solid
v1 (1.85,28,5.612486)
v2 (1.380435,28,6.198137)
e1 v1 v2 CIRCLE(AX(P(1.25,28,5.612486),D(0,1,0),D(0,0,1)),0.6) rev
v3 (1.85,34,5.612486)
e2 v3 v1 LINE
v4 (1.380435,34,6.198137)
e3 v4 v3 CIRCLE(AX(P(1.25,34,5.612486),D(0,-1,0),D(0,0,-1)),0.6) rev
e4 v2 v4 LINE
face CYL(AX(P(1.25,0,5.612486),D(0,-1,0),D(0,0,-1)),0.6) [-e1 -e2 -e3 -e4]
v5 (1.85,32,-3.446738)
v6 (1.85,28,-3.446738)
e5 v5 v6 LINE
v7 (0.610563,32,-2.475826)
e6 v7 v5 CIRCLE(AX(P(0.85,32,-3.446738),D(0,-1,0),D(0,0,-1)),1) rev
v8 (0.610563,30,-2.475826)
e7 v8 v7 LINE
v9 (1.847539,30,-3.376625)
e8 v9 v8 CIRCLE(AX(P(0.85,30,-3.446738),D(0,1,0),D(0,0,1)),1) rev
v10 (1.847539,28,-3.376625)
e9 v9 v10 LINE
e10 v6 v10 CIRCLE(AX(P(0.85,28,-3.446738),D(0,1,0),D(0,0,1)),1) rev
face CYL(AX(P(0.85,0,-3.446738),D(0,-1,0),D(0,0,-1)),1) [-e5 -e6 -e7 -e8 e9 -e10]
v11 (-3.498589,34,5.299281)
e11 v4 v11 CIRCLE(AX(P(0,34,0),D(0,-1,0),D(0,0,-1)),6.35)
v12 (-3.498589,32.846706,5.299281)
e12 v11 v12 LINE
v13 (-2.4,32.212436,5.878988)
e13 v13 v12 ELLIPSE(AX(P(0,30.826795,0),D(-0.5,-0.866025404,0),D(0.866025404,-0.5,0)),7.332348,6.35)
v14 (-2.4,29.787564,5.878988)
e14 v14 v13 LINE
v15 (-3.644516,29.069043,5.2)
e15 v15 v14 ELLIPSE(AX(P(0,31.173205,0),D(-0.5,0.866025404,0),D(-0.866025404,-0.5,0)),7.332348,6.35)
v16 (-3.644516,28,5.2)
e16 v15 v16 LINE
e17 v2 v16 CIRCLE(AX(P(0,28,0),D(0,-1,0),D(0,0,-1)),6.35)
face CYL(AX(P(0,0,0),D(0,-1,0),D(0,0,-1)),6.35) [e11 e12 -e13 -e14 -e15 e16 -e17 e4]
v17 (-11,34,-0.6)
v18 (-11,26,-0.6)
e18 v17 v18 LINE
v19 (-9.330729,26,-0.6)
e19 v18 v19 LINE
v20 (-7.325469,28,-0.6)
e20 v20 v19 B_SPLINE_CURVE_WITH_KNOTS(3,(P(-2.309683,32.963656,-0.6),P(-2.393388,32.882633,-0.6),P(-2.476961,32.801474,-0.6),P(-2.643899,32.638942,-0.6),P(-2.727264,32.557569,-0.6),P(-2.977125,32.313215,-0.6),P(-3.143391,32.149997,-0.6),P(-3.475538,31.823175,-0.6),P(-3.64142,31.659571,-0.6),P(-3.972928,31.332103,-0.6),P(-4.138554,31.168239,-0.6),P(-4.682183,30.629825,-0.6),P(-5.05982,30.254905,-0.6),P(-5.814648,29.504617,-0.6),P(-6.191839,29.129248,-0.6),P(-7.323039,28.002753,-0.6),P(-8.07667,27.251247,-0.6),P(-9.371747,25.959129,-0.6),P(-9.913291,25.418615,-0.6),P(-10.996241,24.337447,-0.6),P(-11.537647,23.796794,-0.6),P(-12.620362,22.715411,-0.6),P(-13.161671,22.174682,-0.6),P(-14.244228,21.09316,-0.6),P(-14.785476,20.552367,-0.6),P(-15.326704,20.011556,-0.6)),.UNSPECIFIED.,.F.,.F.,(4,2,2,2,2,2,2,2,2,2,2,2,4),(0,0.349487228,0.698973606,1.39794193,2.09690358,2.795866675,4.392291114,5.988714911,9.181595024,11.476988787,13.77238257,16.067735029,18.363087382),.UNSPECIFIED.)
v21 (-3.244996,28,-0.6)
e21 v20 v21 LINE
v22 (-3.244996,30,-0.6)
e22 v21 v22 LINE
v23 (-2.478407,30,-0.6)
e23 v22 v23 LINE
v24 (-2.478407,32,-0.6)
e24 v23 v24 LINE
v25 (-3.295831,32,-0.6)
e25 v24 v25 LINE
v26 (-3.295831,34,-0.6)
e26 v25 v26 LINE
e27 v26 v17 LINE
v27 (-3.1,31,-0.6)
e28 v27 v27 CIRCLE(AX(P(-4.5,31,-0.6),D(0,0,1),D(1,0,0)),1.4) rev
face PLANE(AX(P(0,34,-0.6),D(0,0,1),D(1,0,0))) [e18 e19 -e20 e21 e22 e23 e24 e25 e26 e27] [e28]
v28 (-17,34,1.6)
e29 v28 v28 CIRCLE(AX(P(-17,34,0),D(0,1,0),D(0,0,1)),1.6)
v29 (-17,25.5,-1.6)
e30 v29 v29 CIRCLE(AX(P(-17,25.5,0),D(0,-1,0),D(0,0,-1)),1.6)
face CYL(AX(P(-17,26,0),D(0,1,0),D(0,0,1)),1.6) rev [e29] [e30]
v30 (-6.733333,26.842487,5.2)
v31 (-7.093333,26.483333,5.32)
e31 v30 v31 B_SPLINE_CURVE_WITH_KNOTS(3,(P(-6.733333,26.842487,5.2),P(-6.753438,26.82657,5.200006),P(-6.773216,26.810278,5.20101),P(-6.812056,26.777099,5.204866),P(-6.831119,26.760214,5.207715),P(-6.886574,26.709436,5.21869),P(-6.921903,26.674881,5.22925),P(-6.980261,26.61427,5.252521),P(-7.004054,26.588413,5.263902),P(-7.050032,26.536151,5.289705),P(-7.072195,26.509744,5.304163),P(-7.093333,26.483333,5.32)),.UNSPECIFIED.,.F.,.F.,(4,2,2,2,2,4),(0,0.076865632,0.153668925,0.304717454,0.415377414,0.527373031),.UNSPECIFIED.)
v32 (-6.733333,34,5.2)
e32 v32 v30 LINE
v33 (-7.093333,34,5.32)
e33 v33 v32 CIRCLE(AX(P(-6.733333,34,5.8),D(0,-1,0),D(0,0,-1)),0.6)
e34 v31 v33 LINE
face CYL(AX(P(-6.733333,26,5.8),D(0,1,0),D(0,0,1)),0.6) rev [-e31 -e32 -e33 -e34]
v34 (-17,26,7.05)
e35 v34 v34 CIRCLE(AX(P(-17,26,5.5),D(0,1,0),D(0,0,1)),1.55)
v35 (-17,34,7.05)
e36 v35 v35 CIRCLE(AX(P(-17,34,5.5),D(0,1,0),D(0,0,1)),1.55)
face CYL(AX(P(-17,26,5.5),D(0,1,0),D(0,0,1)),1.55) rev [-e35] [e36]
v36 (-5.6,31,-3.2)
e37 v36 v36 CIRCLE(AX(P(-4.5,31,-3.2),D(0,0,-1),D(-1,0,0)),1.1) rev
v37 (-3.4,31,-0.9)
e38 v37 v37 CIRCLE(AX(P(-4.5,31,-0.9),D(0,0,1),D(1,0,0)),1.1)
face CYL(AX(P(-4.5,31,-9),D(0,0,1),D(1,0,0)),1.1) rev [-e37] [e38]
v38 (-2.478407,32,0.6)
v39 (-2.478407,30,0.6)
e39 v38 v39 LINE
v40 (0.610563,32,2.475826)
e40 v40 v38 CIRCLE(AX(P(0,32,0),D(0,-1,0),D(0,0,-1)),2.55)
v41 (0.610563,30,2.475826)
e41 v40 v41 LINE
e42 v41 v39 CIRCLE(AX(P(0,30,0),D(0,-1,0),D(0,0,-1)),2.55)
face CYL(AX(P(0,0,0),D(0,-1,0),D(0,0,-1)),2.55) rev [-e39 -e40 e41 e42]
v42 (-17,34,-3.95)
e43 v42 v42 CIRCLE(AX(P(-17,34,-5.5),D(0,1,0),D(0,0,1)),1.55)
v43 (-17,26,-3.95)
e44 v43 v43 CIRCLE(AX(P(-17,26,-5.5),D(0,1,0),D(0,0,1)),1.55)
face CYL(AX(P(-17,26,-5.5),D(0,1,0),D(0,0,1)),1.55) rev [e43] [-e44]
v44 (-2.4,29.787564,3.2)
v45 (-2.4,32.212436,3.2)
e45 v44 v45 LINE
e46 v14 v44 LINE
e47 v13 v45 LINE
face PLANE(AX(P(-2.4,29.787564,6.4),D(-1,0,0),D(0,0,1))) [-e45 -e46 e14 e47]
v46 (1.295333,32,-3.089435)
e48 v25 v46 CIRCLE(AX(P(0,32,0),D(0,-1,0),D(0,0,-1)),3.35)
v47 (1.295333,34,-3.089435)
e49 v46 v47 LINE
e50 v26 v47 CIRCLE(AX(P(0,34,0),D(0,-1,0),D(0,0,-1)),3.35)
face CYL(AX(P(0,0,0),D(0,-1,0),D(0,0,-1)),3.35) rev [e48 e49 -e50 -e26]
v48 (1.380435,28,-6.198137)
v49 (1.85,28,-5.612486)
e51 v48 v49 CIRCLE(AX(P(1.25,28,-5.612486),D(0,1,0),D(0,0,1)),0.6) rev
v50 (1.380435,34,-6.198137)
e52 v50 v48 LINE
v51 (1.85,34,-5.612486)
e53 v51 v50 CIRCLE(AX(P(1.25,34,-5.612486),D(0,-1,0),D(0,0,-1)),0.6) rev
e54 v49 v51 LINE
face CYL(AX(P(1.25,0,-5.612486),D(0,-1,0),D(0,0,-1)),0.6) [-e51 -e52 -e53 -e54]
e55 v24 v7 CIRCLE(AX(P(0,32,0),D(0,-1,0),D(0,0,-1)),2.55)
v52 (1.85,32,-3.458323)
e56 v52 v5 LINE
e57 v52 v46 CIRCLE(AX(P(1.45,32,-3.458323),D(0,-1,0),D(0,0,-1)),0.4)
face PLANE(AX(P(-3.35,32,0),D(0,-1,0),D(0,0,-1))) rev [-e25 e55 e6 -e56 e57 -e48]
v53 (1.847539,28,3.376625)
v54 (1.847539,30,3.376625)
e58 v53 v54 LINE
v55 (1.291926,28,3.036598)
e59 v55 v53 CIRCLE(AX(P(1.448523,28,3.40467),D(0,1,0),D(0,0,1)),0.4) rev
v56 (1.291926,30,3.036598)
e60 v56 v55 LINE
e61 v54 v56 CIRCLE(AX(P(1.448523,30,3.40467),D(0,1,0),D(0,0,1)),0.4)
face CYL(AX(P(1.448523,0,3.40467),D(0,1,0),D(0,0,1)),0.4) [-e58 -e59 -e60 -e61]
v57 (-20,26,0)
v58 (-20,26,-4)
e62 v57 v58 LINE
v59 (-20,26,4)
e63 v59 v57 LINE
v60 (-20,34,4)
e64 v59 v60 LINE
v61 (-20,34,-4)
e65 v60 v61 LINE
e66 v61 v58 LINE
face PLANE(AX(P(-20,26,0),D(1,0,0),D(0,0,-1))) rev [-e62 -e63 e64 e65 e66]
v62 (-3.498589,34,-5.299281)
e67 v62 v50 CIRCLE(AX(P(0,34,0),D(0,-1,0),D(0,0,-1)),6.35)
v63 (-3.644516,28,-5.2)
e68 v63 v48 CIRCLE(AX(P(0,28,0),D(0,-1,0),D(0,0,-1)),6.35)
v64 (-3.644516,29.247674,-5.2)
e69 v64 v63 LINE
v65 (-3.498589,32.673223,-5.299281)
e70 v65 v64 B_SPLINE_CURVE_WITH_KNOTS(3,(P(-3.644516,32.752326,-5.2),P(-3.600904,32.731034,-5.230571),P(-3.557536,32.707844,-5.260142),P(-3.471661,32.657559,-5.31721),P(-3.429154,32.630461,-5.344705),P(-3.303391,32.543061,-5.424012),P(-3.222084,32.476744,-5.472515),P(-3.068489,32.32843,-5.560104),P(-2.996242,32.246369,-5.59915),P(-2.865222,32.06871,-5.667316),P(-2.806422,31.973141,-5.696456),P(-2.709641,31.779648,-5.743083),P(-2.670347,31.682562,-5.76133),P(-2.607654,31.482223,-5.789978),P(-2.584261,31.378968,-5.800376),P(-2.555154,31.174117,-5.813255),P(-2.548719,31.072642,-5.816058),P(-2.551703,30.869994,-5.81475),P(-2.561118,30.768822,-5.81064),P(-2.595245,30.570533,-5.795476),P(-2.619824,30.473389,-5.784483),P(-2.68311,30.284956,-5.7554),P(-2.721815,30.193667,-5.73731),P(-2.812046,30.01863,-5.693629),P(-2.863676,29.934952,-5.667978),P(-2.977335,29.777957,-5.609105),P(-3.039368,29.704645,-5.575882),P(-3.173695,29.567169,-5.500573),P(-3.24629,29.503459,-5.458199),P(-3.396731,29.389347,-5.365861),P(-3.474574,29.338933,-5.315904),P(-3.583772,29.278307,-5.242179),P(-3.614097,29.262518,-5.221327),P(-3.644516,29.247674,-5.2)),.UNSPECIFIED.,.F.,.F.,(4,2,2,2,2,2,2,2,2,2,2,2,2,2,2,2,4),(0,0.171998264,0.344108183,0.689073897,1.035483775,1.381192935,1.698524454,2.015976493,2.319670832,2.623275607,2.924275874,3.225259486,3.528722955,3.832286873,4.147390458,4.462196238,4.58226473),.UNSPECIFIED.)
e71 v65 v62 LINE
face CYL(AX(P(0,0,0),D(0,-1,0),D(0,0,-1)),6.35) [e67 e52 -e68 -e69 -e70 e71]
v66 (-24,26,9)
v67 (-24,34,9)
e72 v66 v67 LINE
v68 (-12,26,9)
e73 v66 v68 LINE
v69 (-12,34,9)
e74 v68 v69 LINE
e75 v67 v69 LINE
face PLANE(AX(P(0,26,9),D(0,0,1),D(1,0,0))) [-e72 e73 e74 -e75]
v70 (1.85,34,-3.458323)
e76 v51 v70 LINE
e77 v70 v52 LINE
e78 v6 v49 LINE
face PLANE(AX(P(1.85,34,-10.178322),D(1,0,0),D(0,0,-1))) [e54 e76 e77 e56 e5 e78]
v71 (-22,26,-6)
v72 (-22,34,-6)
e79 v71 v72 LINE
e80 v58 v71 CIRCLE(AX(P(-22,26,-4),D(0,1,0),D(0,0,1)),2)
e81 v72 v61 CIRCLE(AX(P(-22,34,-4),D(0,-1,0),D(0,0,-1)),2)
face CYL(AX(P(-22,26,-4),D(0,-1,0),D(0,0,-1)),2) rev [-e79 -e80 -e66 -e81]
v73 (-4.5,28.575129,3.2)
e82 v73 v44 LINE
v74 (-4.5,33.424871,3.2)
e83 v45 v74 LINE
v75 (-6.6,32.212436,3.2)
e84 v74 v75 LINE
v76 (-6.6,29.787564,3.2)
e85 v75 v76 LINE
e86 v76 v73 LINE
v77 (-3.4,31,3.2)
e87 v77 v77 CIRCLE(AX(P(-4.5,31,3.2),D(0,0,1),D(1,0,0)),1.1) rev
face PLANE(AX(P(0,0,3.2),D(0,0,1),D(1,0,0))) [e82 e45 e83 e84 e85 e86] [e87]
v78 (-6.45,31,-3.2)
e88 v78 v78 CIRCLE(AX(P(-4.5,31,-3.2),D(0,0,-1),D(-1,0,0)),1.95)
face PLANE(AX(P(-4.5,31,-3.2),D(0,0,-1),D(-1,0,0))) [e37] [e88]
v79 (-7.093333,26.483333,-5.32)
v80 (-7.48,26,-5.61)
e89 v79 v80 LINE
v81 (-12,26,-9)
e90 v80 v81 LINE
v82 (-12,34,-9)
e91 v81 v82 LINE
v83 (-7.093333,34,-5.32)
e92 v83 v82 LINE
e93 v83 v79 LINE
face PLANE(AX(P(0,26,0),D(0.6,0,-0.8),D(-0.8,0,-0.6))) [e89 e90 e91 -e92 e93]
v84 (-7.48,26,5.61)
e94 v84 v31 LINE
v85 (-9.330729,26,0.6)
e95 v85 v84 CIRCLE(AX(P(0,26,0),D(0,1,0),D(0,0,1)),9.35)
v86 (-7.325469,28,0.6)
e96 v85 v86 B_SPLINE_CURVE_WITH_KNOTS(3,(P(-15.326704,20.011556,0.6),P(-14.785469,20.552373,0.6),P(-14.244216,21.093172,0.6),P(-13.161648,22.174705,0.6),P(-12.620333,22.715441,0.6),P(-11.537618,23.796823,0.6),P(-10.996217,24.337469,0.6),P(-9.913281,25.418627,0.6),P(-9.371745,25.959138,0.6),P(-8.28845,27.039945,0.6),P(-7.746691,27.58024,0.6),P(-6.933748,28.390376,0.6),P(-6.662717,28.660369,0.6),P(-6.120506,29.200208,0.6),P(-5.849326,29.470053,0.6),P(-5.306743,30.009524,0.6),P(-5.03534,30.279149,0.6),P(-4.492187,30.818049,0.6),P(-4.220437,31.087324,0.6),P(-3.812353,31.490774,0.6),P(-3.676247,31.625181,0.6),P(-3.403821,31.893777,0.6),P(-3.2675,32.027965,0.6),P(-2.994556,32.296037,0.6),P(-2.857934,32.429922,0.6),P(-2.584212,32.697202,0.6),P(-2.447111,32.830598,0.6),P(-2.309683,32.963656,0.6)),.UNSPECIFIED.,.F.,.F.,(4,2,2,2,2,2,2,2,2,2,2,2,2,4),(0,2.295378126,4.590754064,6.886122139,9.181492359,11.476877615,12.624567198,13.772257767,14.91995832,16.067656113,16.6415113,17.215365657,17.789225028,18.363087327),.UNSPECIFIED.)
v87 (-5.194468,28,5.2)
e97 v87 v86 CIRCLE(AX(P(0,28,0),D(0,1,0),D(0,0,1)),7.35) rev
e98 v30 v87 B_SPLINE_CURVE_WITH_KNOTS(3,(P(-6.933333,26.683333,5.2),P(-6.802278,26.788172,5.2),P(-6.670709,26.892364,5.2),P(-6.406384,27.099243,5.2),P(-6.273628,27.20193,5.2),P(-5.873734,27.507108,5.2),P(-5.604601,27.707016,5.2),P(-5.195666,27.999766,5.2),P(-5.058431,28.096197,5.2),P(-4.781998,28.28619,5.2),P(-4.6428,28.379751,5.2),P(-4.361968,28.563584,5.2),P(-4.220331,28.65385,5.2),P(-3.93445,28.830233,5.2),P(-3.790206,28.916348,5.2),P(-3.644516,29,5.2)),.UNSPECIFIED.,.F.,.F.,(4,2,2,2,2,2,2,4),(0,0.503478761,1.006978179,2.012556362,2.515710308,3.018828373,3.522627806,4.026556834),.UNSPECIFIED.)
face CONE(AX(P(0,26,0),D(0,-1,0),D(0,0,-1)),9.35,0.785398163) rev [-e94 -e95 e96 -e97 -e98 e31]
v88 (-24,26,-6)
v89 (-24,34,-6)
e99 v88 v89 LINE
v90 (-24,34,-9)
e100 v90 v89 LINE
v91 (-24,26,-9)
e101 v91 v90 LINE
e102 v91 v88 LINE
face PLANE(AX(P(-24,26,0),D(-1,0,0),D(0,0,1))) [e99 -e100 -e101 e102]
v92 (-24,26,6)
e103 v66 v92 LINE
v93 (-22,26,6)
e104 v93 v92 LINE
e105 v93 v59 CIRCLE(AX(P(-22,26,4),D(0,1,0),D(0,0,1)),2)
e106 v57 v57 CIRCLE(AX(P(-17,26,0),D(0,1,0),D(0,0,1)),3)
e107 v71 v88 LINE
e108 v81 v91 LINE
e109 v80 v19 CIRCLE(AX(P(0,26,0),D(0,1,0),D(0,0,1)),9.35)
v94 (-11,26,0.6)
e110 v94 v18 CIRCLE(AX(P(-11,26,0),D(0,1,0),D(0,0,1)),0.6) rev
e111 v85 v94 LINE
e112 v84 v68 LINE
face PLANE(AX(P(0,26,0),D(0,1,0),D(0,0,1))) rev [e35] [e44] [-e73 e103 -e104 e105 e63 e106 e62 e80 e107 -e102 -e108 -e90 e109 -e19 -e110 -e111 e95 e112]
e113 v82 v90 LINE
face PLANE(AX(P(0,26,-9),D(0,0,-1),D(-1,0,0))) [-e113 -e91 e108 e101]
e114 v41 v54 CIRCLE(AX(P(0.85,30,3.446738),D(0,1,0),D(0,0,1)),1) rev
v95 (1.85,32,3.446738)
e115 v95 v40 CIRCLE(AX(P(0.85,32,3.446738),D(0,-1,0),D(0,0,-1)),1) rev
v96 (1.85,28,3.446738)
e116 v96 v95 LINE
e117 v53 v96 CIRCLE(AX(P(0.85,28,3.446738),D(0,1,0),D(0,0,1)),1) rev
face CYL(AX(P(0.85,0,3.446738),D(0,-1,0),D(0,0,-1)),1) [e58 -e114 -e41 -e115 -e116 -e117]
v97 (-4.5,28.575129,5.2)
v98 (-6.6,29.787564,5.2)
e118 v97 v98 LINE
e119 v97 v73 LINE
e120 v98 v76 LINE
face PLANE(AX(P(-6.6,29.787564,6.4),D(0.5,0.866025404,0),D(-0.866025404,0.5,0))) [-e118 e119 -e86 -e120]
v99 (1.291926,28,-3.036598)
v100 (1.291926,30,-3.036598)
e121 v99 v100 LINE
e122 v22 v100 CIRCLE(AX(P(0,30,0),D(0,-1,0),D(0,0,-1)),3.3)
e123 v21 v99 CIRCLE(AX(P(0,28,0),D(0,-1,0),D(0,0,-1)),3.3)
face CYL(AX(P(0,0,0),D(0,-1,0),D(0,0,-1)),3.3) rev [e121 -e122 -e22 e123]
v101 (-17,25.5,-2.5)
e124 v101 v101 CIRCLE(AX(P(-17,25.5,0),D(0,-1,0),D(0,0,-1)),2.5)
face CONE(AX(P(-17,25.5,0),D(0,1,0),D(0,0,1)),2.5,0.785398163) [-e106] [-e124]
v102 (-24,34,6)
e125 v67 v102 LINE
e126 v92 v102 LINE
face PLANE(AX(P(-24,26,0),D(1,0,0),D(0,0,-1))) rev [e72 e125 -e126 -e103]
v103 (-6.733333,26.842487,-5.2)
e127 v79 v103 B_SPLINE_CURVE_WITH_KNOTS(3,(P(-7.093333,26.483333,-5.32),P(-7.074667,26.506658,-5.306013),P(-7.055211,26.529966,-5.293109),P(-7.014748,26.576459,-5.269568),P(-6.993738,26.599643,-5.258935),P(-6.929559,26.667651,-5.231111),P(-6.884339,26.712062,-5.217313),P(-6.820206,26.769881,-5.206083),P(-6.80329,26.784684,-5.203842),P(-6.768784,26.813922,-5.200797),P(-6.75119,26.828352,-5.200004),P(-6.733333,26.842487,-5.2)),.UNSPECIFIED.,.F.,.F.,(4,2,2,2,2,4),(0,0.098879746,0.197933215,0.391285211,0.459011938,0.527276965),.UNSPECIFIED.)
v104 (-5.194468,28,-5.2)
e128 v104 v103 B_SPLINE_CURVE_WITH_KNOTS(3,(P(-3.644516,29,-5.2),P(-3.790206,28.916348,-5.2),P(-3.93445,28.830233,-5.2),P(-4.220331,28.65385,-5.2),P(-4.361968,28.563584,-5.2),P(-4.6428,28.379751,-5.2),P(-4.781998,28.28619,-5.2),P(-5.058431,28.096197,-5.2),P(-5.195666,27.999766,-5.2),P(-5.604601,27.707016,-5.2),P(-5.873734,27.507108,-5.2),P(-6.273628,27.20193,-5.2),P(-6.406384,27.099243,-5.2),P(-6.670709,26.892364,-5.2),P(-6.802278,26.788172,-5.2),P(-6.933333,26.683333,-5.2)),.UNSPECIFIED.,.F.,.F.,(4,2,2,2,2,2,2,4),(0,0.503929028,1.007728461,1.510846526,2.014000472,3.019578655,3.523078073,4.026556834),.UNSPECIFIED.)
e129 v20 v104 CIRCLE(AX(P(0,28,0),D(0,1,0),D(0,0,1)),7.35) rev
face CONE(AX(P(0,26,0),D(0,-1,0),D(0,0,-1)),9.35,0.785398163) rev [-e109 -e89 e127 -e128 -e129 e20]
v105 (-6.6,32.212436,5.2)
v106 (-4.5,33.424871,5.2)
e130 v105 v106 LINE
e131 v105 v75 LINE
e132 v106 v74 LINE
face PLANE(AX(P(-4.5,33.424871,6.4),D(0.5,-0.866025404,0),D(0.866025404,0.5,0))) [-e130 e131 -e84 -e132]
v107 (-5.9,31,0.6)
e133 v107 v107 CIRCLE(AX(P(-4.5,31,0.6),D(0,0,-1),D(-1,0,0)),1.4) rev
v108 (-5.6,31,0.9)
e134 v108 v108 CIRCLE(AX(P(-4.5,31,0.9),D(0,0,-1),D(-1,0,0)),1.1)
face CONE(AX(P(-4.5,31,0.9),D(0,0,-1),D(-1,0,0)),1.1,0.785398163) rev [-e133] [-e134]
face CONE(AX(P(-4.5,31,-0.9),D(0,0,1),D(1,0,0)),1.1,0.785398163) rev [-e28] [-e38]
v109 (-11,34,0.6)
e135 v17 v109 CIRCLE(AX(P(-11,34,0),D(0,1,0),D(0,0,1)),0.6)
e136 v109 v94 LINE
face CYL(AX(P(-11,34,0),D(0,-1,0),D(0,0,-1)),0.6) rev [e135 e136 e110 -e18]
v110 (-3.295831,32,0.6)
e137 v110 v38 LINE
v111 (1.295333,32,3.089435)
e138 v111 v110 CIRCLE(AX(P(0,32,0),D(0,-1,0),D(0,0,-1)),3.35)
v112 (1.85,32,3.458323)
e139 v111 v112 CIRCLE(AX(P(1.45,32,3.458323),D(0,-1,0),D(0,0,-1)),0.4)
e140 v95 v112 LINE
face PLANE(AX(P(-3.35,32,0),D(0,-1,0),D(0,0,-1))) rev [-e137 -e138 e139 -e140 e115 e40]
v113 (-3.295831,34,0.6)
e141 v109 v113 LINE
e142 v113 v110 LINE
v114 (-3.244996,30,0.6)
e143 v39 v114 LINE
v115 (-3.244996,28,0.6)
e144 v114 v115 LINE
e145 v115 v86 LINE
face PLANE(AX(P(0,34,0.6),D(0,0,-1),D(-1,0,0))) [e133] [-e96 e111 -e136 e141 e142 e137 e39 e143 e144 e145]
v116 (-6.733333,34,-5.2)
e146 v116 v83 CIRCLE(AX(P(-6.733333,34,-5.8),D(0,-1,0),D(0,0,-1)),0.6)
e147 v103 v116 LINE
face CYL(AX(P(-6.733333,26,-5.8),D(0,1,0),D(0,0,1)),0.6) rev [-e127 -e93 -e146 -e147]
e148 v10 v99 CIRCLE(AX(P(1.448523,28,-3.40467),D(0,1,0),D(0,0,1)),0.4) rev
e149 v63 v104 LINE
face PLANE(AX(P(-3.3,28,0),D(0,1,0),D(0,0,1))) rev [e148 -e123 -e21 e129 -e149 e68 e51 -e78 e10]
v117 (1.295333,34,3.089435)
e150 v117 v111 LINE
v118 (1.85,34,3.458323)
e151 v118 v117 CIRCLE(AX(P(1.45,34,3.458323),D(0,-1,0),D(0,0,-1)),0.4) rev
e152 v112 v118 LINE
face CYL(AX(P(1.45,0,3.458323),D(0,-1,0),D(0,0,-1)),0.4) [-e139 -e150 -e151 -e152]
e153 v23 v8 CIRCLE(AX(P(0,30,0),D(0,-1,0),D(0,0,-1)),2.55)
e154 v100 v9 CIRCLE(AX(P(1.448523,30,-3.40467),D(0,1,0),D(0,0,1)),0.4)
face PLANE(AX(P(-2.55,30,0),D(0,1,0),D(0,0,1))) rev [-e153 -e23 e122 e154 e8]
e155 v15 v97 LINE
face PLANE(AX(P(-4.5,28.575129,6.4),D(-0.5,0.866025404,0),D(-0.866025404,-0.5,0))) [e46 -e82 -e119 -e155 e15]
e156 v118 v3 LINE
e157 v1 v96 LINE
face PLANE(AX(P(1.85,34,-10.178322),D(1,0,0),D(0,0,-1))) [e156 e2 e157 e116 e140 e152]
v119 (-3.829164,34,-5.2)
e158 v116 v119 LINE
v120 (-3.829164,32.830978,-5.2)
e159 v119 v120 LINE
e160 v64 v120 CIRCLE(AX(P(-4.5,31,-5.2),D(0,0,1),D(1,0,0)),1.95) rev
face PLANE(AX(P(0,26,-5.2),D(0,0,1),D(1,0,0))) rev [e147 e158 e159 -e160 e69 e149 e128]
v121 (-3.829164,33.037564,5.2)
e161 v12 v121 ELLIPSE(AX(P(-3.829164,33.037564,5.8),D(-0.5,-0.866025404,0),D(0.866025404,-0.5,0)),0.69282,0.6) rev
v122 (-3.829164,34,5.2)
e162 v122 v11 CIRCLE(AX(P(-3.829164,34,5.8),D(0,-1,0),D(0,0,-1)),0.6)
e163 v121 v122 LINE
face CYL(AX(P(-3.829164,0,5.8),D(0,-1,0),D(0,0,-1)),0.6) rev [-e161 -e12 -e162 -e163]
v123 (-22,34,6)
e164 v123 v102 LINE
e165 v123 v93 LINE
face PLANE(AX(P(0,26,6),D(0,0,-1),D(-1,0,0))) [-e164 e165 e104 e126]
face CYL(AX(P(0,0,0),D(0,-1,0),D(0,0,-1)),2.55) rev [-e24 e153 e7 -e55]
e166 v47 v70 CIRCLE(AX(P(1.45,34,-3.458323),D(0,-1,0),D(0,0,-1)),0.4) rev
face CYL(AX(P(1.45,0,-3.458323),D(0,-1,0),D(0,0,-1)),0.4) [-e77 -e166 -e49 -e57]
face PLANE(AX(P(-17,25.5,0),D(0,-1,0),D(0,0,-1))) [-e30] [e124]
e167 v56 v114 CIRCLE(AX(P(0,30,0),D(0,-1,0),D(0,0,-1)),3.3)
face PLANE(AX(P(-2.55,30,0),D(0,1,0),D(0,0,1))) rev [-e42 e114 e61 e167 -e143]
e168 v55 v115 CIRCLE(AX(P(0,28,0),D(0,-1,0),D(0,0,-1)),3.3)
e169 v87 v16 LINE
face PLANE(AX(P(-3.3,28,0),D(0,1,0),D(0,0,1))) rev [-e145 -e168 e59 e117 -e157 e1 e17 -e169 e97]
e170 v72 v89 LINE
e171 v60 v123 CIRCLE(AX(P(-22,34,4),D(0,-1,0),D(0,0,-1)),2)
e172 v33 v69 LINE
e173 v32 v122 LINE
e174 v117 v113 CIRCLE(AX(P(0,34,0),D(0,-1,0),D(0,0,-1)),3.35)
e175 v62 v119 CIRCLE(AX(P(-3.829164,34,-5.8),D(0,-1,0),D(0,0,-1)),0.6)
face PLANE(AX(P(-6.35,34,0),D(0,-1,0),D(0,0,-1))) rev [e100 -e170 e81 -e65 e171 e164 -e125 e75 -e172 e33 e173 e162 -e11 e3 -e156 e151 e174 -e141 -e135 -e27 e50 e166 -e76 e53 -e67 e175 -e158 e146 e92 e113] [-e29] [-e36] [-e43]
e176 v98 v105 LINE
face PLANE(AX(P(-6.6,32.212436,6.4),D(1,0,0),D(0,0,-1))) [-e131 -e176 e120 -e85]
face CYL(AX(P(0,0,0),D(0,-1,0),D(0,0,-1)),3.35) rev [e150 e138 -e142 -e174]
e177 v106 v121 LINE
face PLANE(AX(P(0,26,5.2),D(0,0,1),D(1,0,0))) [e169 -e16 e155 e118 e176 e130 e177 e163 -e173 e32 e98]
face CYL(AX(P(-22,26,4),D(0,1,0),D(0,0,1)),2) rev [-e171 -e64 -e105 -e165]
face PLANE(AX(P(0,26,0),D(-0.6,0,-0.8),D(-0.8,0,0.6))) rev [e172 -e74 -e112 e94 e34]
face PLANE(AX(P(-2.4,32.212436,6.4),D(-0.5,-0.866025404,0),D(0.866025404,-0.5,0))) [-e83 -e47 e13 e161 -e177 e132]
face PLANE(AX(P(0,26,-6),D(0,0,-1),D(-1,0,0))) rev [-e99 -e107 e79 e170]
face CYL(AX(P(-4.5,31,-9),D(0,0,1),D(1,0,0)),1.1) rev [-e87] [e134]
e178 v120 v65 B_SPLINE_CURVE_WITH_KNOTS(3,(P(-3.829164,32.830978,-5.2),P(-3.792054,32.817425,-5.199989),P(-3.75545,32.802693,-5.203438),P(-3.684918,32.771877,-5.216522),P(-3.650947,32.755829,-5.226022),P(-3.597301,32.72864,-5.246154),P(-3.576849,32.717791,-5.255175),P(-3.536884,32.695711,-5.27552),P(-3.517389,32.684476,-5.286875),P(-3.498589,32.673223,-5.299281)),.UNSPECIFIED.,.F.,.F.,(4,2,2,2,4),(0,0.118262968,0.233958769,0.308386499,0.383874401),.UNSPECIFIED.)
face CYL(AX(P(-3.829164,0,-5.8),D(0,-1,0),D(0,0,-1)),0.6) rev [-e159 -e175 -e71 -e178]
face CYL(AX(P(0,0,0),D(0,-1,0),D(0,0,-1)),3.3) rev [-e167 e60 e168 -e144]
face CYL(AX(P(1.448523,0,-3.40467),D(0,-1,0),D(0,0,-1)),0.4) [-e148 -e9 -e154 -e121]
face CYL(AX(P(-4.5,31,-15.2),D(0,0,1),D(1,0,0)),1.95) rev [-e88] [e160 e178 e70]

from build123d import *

# Parameters (mm, degrees)
SKETCH2_W               = 4
SKETCH2_H               = 3
SKETCH2_R               = 1.55
SKETCH2_R_2             = 1.6
BOSS_EXTRUDE1_DEPTH     = 8
SKETCH3_W               = 8.237002406
SKETCH3_H               = 20.610649192
CUT_EXTRUDE1_DEPTH      = 43.579337712
CHAMFER1_SIZE           = 3
FILLET4_R               = 1
FILLET5_R               = 0.4
FILLET6_R               = 2
CUT_EXTRUDE2_DEPTH      = 43.579337712
SKETCH7_R               = 2.5
SKETCH7_R_2             = 1.6
BOSS_EXTRUDE2_DEPTH     = 0.5
CHAMFER2_SIZE           = 0.5
CUT_EXTRUDE4_DEPTH      = 43.579337712
CUT_EXTRUDE4_DEPTH_BACK = 43.579337712
SKETCH8_R               = 1.1
FILLET7_R               = 0.6
CHAMFER3_SIZE           = 0.3
CUT_EXTRUDE5_DEPTH      = 1.2
CUT_EXTRUDE5_DEPTH_BACK = 2
CUT_EXTRUDE6_DEPTH      = 10
CUT_EXTRUDE6_DEPTH_BACK = 2
SKETCH11_R              = 1.95


# Some blends are built 0.0001 mm under size
with BuildPart() as part:
    # Sketch1 → Revolve1 (revolve)
    with BuildSketch(Plane.XY, mode=Mode.PRIVATE) as revolve1_sk:
        Polygon((-3.35, 34), (-3.35, 32), (-2.55, 32), (-2.55, 30), (-3.3, 30), (-3.3, 28), (-6.35, 28), (-6.35, 34), align=None)
    revolve(revolve1_sk.sketch.rotate(Axis((0, 0, 0), (0, 1, 0)), 270), axis=Axis((0, 0, 0), (0, 1, 0)))

    # Sketch2 → Boss-Extrude1 (add)
    # profile 1 of 6: a face of its own
    with BuildSketch(Plane(origin=(0, 34, 0), x_dir=(1, 0, 0), z_dir=(0, 1, 0))):
        with Locations((-22, 7.5)):
            Rectangle(SKETCH2_W, SKETCH2_H)
    # profile 2 of 6: a face of its own
    with BuildSketch(Plane(origin=(0, 34, 0), x_dir=(1, 0, 0), z_dir=(0, 1, 0))):
        with Locations((-22, -7.5)):
            Rectangle(SKETCH2_W, SKETCH2_H)
    # profile 3 of 6: a face of its own
    with BuildSketch(Plane(origin=(0, 34, 0), x_dir=(1, 0, 0), z_dir=(0, 1, 0))):
        Polygon((-12, 9), (-20, 9), (-20, 6), (-20, -6), (-20, -9), (-12, -9), (-6.933333333, -5.2), (-8.990544831, -5.2), (-8.990544831, 5.2), (-6.933333333, 5.2), align=None)
        with Locations(Location((-17, -5.5, 0), (0, 0, 270))):
            Circle(SKETCH2_R, mode=Mode.SUBTRACT)
        with Locations(Location((-17, 0, 0), (0, 0, 270))):
            Circle(SKETCH2_R_2, mode=Mode.SUBTRACT)
        with Locations(Location((-17, 5.5, 0), (0, 0, 270))):
            Circle(SKETCH2_R, mode=Mode.SUBTRACT)
    # profile 4 of 6: a face of its own
    with BuildSketch(Plane(origin=(0, 34, 0), x_dir=(1, 0, 0), z_dir=(0, 1, 0))):
        with BuildLine():
            Line((-5.08, 3.81), (-6.933333333, 5.2))
            Line((-6.933333333, 5.2), (-8.990544831, 5.2))
            Line((-8.990544831, 5.2), (-8.990544831, -5.2))
            Line((-8.990544831, -5.2), (-6.933333333, -5.2))
            Line((-6.933333333, -5.2), (-5.08, -3.81))
            ThreePointArc((-5.08, -3.81), (-6.35, 0), (-5.08, 3.81))
        make_face()
    # profile 5 of 6: a face of its own
    with BuildSketch(Plane(origin=(0, 34, 0), x_dir=(1, 0, 0), z_dir=(0, 1, 0))):
        with BuildLine():
            Line((-3.644516429, 5.2), (-6.933333333, 5.2))
            Line((-6.933333333, 5.2), (-5.08, 3.81))
            ThreePointArc((-5.08, 3.81), (-4.417275374, 4.561817431), (-3.644516429, 5.2))
        make_face()
    # profile 6 of 6: a face of its own
    with BuildSketch(Plane(origin=(0, 34, 0), x_dir=(1, 0, 0), z_dir=(0, 1, 0))):
        with BuildLine():
            ThreePointArc((-3.644516429, -5.2), (-4.417275374, -4.561817431), (-5.08, -3.81))
            Line((-5.08, -3.81), (-6.933333333, -5.2))
            Line((-6.933333333, -5.2), (-3.644516429, -5.2))
        make_face()
    extrude(amount=-BOSS_EXTRUDE1_DEPTH)

    # Sketch3 → Cut-Extrude1 (cut, through all)
    with BuildSketch(Plane(origin=(0, 0, 0), x_dir=(1, 0, 0), z_dir=(0, 1, 0))):
        with Locations((5.968501203, -0.12700224)):
            Rectangle(SKETCH3_W, SKETCH3_H)
    extrude(amount=CUT_EXTRUDE1_DEPTH, mode=Mode.SUBTRACT)

    # Chamfer1
    # the kernel refuses this chamfer: 3 mm, written as the material it adds along each edge
    # the kernel refuses this chamfer: 3 mm, written as the material it takes off along each edge
    with BuildSketch(Plane(origin=(0, 26, 0), x_dir=(0.568258769278242, 0, -0.8228499080259886), z_dir=(0.8228499080259886, 0, 0.568258769278242))) as chamfer1_2_piece_1_section:
        Polygon((6.35 + CHAMFER1_SIZE, 0), (6.35, CHAMFER1_SIZE), (6.35, 0), align=None)
    chamfer1_2_piece_1 = revolve(axis=Axis((0, 26, 0), (0, 1, 0)), revolution_arc=249.257786961, mode=Mode.PRIVATE)
    chamfer1_2_piece_1 = split(chamfer1_2_piece_1, bisect_by=Plane(origin=(-8.355666821, 28, 0), z_dir=(0, -1, 0)), keep=Keep.TOP, mode=Mode.PRIVATE)
    add(chamfer1_2_piece_1, mode=Mode.SUBTRACT)

    # Fillet4
    fillet4_edges = [part.edges().sort_by_distance(p)[0] for p in [
        (1.85, 31, 1.754992877),
        (1.85, 31, -1.754992877),
    ]]
    fillet(fillet4_edges, radius=FILLET4_R)

    # Fillet5
    # the kernel refuses this fillet: 0.4 mm, written as the material it takes off along each edge
    with BuildSketch(Plane(origin=(1.684476075, 35.466182436, -2.895693415), x_dir=(-0.8951889914868396, 0, -0.4456867392247326), z_dir=(0, -1, 0))) as fillet5_piece_1:
        with BuildLine():
            CenterArc((0.460657077, 0.399157196), FILLET5_R, 153.532715484, 112.747248008)
            Line((0.10258148, 0.577431892), (0.06677392, 0.595259361))
            ThreePointArc((0.06677392, 0.595259361), (0.061610325, 0.584887966), (-0.039704275, -0.00485495))
            Line((-0.039704275, -0.00485495), (0.002595251, -0.03991572))
            ThreePointArc((0.002595251, -0.03991572), (0.217352283, -0.032941517), (0.432109314, -0.03991572))
            Line((0.432109314, -0.03991572), (0.434704565, 0))
        make_face()
    extrude(amount=3.466182436, mode=Mode.SUBTRACT)
    with BuildSketch(Plane(origin=(1.655788422, 26.609524103, -2.85453406), x_dir=(0.3447573093533237, 0, -0.938691854469536), z_dir=(0, 1, 0))) as fillet5_piece_2:
        with BuildLine():
            CenterArc((0.444952287, 0.384221409), FILLET5_R, 177.1195622, 109.026989702)
            ThreePointArc((0.045457658, 0.404322189), (0.028966063, 0.201459847), (0, 0))
            ThreePointArc((0, 0), (0.278095179, -0.039446477), (0.556190359, 0))
        make_face()
    extrude(amount=3.390475897, mode=Mode.SUBTRACT)
    with BuildSketch(Plane(origin=(1.655788422, 26.609524103, 2.85453406), x_dir=(0.3447573093533235, 0, 0.9386918544695363), z_dir=(0, 1, 0))) as fillet5_piece_3:
        with BuildLine():
            CenterArc((0.444952287, -0.384221409), FILLET5_R, 73.853448098, 109.026989702)
            ThreePointArc((0.045457658, -0.404322189), (0.028966063, -0.201459847), (0, 0))
            ThreePointArc((0, 0), (0.278095179, 0.039446477), (0.556190359, 0))
        make_face()
    extrude(amount=3.390475897, mode=Mode.SUBTRACT)
    with BuildSketch(Plane(origin=(1.684476075, 35.466182436, 2.895693415), x_dir=(-0.8951889914868395, 0, 0.44568673922473334), z_dir=(0, -1, 0))) as fillet5_piece_4:
        with BuildLine():
            CenterArc((0.460657077, -0.399157196), FILLET5_R, 93.720036508, 112.747248008)
            Line((0.10258148, -0.577431892), (0.06677392, -0.595259361))
            ThreePointArc((0.06677392, -0.595259361), (0.061610325, -0.584887966), (-0.039704275, 0.00485495))
            Line((-0.039704275, 0.00485495), (0.002595251, 0.03991572))
            ThreePointArc((0.002595251, 0.03991572), (0.217352283, 0.032941517), (0.432109314, 0.03991572))
            Line((0.432109314, 0.03991572), (0.434704565, 0))
        make_face()
    extrude(amount=3.466182436, mode=Mode.SUBTRACT)

    # Fillet6
    fillet6_edges = [part.edges().sort_by_distance(p)[0] for p in [
        (-20, 30, 6),
        (-20, 30, -6),
    ]]
    fillet(fillet6_edges, radius=FILLET6_R)

    # Sketch5 → Cut-Extrude2 (cut, through all)
    with BuildSketch(Plane(origin=(0, 0, 0), x_dir=(1, 0, 0), z_dir=(0, 1, 0))):
        with BuildLine():
            Line((0, -0.6), (-11, -0.6))
            ThreePointArc((-11, -0.6), (-11.6, 0), (-11, 0.6))
            Line((-11, 0.6), (0, 0.6))
            ThreePointArc((0, 0.6), (0.6, 0), (0, -0.6))
        make_face()
    extrude(amount=CUT_EXTRUDE2_DEPTH, mode=Mode.SUBTRACT)

    # Sketch7 → Boss-Extrude2 (add)
    with BuildSketch(Plane.XZ.offset(-26)):
        with Locations(Location((-17, 0, 0), (0, 0, 90))):
            Circle(SKETCH7_R)
        with Locations(Location((-17, 0, 0), (0, 0, 90))):
            Circle(SKETCH7_R_2, mode=Mode.SUBTRACT)
    extrude(amount=BOSS_EXTRUDE2_DEPTH)

    # Chamfer2
    chamfer2_edges = [part.edges().sort_by_distance(p)[0] for p in [
        (-17, 26, -2.5),
    ]]
    chamfer(chamfer2_edges, length=CHAMFER2_SIZE - 0.0001)  # a hair under: the kernel refuses the full size

    # Sketch8 → Cut-Extrude4 (cut, two sides: drawn at the far end of the back side and taken through both)
    with BuildSketch(Plane.XY.offset(-CUT_EXTRUDE4_DEPTH_BACK)):
        with Locations(Location((-4.5, 31, 0), (0, 0, 321.051593768))):
            Circle(SKETCH8_R)
    extrude(amount=CUT_EXTRUDE4_DEPTH + CUT_EXTRUDE4_DEPTH_BACK, mode=Mode.SUBTRACT)

    # Fillet7
    fillet7_edges = [part.edges().sort_by_distance(p)[0] for p in [
        (-3.644516429, 32.845741182, 5.2),
        (-3.644516429, 32.845741182, -5.2),
        (1.85, 31, 6.074537019),
        (1.85, 31, -6.074537019),
        (-6.933333333, 30.341666667, 5.2),
        (-6.933333333, 30.341666667, -5.2),
    ]]
    fillet(fillet7_edges, radius=FILLET7_R)

    # Chamfer3
    chamfer3_edges = [part.edges().sort_by_distance(p)[0] for p in [
        (-5.355483571, 31.691482364, 0.6),
        (-5.355483571, 31.691482364, -0.6),
    ]]
    chamfer(chamfer3_edges, length=CHAMFER3_SIZE)

    # Sketch10 → Cut-Extrude5 (cut, two sides: drawn at the far end of the back side and taken through both)
    with BuildSketch(Plane.XY.offset(5.2).offset(-CUT_EXTRUDE5_DEPTH_BACK)):
        Polygon((-4.5, 28.575128869), (-2.4, 29.787564435), (-2.4, 32.212435565), (-4.5, 33.424871131), (-6.6, 32.212435565), (-6.6, 29.787564435), align=None)
    extrude(amount=CUT_EXTRUDE5_DEPTH + CUT_EXTRUDE5_DEPTH_BACK, mode=Mode.SUBTRACT)

    # Sketch11 → Cut-Extrude6 (cut, two sides: drawn at the far end of the back side and taken through both)
    with BuildSketch(Plane(origin=(0, 0, -5.2), x_dir=(-1, 0, 0), z_dir=(0, 0, -1)).offset(-CUT_EXTRUDE6_DEPTH_BACK)):
        with Locations(Location((4.5, 31, 0), (0, 0, 120.900188268))):
            Circle(SKETCH11_R)
    extrude(amount=CUT_EXTRUDE6_DEPTH + CUT_EXTRUDE6_DEPTH_BACK, mode=Mode.SUBTRACT)


solid = part.part
